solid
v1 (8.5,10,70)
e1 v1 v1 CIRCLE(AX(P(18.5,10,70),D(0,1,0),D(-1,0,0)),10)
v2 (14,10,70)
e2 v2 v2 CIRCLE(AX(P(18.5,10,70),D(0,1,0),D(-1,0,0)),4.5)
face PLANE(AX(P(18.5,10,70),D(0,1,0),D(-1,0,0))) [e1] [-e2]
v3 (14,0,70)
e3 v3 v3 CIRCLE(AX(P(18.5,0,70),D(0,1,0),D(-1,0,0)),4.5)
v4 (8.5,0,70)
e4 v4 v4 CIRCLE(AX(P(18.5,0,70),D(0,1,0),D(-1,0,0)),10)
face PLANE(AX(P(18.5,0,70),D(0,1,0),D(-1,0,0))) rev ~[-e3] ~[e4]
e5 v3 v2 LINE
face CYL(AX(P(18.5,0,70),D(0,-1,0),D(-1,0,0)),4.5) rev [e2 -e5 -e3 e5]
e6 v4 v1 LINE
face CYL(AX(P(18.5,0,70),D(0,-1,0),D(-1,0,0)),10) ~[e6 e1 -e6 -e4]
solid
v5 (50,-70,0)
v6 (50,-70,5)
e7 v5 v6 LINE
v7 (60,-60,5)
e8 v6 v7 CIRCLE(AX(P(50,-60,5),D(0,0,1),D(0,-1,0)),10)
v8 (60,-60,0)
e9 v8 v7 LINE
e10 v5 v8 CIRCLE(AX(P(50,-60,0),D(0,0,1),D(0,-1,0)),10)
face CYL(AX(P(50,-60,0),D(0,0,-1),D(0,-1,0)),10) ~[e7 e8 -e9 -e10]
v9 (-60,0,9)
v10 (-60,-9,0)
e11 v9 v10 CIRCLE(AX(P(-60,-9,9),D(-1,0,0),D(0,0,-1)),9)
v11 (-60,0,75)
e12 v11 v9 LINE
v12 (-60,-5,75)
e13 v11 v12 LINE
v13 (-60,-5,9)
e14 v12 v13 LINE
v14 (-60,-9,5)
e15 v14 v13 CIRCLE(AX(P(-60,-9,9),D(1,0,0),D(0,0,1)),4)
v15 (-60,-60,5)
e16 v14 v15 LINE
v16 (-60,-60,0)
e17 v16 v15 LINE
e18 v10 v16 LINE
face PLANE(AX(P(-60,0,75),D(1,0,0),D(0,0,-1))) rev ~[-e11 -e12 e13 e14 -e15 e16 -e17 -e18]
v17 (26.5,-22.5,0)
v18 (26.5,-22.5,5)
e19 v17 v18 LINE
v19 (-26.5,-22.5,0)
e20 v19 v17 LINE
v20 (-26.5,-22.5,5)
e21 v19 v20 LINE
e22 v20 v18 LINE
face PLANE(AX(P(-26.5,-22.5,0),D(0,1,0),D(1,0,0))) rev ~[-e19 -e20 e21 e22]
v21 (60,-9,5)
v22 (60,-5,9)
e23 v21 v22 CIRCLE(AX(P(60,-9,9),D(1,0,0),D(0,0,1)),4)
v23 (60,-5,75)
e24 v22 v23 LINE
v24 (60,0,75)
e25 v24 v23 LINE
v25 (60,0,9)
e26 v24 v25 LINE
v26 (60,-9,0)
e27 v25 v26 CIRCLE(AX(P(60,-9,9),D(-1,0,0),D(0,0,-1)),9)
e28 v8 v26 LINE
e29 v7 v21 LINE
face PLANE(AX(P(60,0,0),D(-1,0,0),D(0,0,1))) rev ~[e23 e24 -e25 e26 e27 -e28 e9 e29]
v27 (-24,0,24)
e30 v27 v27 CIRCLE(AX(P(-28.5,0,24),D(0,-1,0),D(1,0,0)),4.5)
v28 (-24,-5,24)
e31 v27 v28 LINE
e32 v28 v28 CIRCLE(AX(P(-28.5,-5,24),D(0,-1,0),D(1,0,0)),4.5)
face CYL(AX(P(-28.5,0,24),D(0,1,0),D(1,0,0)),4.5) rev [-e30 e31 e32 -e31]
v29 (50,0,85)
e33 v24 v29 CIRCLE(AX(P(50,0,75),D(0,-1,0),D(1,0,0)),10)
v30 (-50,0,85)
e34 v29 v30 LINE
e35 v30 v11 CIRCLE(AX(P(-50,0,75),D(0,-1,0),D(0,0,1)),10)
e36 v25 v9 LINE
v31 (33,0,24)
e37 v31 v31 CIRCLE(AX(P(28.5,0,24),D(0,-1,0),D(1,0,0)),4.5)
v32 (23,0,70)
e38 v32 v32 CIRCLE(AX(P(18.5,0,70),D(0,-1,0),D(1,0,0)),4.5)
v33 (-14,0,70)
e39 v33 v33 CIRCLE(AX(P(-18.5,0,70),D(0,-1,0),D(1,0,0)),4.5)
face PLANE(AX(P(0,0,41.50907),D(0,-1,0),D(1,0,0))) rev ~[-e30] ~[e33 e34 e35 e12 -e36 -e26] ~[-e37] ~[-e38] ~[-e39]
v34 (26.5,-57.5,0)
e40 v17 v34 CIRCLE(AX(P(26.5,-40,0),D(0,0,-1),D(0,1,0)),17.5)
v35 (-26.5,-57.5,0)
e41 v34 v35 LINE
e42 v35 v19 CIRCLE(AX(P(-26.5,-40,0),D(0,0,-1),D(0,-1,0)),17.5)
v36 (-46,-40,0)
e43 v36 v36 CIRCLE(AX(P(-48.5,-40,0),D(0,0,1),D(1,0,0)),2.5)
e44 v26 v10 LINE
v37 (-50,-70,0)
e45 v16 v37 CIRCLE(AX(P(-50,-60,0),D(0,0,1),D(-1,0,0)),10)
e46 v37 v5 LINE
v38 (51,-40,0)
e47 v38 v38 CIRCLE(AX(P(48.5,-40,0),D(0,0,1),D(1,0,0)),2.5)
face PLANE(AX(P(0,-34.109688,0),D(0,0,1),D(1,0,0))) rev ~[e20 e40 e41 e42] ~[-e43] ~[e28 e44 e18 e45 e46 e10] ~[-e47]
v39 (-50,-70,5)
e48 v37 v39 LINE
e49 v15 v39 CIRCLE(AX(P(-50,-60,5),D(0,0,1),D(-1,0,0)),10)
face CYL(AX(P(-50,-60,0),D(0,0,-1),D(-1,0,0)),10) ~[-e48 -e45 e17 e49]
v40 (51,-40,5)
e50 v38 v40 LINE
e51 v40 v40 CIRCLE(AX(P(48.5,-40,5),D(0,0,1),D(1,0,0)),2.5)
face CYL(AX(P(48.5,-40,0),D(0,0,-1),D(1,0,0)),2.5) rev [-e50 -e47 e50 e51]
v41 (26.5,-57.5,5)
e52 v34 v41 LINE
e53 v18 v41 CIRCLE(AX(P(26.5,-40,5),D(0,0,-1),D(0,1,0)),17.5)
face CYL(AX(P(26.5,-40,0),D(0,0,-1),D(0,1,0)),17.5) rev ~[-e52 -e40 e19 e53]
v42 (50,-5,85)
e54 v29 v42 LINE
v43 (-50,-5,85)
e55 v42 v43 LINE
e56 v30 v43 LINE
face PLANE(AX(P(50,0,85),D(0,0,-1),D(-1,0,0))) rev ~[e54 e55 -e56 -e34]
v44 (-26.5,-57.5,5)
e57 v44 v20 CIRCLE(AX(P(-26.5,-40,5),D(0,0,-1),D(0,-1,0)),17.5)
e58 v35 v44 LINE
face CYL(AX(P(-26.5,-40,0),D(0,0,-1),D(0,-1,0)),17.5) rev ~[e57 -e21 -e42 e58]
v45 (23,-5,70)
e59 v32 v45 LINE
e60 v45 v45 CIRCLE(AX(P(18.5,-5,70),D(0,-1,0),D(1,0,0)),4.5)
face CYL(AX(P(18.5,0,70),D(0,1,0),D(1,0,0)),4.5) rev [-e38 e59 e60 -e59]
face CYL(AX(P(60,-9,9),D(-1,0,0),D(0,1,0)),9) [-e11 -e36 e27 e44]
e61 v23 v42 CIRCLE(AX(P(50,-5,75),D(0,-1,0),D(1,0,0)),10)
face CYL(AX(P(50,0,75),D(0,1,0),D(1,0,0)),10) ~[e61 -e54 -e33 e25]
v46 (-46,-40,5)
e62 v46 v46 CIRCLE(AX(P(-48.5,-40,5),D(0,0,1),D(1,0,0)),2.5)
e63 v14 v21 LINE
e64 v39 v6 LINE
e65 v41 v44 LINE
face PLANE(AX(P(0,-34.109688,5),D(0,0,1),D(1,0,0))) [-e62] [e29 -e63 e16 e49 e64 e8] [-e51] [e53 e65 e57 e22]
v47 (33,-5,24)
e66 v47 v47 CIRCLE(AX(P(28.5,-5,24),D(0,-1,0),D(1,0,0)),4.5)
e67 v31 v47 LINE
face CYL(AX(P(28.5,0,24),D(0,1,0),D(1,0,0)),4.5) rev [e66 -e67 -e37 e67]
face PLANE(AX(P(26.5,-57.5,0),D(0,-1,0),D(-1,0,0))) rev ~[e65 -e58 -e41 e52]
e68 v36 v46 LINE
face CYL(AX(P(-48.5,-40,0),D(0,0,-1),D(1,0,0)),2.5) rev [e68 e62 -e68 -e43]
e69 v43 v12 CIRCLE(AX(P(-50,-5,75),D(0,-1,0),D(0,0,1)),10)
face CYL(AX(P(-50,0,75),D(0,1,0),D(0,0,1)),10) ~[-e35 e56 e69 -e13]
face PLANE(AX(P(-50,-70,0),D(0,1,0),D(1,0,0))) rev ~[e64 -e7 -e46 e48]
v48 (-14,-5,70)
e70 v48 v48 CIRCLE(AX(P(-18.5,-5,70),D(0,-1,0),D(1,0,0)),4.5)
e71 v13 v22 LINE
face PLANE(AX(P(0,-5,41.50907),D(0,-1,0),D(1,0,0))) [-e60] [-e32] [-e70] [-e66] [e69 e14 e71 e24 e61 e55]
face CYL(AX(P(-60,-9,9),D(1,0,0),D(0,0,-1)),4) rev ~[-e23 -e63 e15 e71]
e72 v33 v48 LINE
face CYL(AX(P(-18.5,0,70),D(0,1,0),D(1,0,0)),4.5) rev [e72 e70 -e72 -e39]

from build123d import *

# Parameters (mm, degrees)
F0_R     = 2.5
F1_DEPTH = 5
F0_R_2   = 4.5
F2_DEPTH = 5
F3_ANGLE = 90
F6_R     = 4
F7_R     = 9
F8_R     = 10
F8_R_2   = 4.5
F9_DEPTH = 10


with BuildPart() as f1:
    # F0 (on Top) → F1 (new body)
    with BuildSketch(Plane.XY):
        with BuildLine():
            Line((60, 0), (-60, 0))
            Line((-60, 0), (-60, -60))
            ThreePointArc((-60, -60), (-57.0710678119, -67.0710678119), (-50, -70))
            Line((-50, -70), (50, -70))
            ThreePointArc((50, -70), (57.0710678119, -67.0710678119), (60, -60))
            Line((60, -60), (60, 0))
        make_face()
        with Locations((-48.5, -40)):
            Circle(F0_R, mode=Mode.SUBTRACT)
        with BuildLine():
            Line((-26.5, -22.5), (26.5, -22.5))
            ThreePointArc((26.5, -22.5), (44, -40), (26.5, -57.5))
            Line((26.5, -57.5), (-26.5, -57.5))
            ThreePointArc((-26.5, -57.5), (-44, -40), (-26.5, -22.5))
        make_face(mode=Mode.SUBTRACT)
        with Locations((48.5, -40)):
            Circle(F0_R, mode=Mode.SUBTRACT)
    extrude(amount=F1_DEPTH)


with BuildPart() as f2:
    # F0 (on Top) → F2 (new body)
    with BuildSketch(Plane.XY):
        with BuildLine():
            Line((-60, 75), (-60, 0))
            Line((-60, 0), (60, 0))
            Line((60, 0), (60, 75))
            ThreePointArc((60, 75), (57.0710678119, 82.0710678119), (50, 85))
            Line((50, 85), (-50, 85))
            ThreePointArc((-50, 85), (-57.0710678119, 82.0710678119), (-60, 75))
        make_face()
        with Locations((-28.5, 24)):
            Circle(F0_R_2, mode=Mode.SUBTRACT)
        with Locations((-18.5, 70)):
            Circle(F0_R_2, mode=Mode.SUBTRACT)
        with Locations((28.5, 24)):
            Circle(F0_R_2, mode=Mode.SUBTRACT)
        with Locations((18.5, 70)):
            Circle(F0_R_2, mode=Mode.SUBTRACT)
    extrude(amount=F2_DEPTH)


with BuildPart() as f2_1:
    # F3: moved
    add(f2.part.rotate(Axis((0, 0, 5), (1, 0, 0)), F3_ANGLE))


with BuildPart() as f2_2:
    # F4: moved
    add(f2_1.part.moved(Location((0, -5, -5))))


with BuildPart() as f1_1:
    add(f1.part)

    # F5: union F2
    add(f2_2.part)

    # F6
    f6_edges = [f1_1.edges().sort_by_distance(p)[0] for p in [
        (0, -5, 5),
    ]]
    fillet(f6_edges, radius=F6_R)

    # F7
    f7_edges = [f1_1.edges().sort_by_distance(p)[0] for p in [
        (0, 0, 0),
    ]]
    fillet(f7_edges, radius=F7_R)


with BuildPart() as f9:
    # F8 (on face) → F9 (new body)
    with BuildSketch(Plane(origin=(0, 0, 0), x_dir=(-1, 0, 0), z_dir=(0, 1, 0))):
        with Locations((-18.5, 70)):
            Circle(F8_R)
        with Locations((-18.5, 70)):
            Circle(F8_R_2, mode=Mode.SUBTRACT)
    extrude(amount=F9_DEPTH)


solid = Compound([f1_1.part, f9.part])
